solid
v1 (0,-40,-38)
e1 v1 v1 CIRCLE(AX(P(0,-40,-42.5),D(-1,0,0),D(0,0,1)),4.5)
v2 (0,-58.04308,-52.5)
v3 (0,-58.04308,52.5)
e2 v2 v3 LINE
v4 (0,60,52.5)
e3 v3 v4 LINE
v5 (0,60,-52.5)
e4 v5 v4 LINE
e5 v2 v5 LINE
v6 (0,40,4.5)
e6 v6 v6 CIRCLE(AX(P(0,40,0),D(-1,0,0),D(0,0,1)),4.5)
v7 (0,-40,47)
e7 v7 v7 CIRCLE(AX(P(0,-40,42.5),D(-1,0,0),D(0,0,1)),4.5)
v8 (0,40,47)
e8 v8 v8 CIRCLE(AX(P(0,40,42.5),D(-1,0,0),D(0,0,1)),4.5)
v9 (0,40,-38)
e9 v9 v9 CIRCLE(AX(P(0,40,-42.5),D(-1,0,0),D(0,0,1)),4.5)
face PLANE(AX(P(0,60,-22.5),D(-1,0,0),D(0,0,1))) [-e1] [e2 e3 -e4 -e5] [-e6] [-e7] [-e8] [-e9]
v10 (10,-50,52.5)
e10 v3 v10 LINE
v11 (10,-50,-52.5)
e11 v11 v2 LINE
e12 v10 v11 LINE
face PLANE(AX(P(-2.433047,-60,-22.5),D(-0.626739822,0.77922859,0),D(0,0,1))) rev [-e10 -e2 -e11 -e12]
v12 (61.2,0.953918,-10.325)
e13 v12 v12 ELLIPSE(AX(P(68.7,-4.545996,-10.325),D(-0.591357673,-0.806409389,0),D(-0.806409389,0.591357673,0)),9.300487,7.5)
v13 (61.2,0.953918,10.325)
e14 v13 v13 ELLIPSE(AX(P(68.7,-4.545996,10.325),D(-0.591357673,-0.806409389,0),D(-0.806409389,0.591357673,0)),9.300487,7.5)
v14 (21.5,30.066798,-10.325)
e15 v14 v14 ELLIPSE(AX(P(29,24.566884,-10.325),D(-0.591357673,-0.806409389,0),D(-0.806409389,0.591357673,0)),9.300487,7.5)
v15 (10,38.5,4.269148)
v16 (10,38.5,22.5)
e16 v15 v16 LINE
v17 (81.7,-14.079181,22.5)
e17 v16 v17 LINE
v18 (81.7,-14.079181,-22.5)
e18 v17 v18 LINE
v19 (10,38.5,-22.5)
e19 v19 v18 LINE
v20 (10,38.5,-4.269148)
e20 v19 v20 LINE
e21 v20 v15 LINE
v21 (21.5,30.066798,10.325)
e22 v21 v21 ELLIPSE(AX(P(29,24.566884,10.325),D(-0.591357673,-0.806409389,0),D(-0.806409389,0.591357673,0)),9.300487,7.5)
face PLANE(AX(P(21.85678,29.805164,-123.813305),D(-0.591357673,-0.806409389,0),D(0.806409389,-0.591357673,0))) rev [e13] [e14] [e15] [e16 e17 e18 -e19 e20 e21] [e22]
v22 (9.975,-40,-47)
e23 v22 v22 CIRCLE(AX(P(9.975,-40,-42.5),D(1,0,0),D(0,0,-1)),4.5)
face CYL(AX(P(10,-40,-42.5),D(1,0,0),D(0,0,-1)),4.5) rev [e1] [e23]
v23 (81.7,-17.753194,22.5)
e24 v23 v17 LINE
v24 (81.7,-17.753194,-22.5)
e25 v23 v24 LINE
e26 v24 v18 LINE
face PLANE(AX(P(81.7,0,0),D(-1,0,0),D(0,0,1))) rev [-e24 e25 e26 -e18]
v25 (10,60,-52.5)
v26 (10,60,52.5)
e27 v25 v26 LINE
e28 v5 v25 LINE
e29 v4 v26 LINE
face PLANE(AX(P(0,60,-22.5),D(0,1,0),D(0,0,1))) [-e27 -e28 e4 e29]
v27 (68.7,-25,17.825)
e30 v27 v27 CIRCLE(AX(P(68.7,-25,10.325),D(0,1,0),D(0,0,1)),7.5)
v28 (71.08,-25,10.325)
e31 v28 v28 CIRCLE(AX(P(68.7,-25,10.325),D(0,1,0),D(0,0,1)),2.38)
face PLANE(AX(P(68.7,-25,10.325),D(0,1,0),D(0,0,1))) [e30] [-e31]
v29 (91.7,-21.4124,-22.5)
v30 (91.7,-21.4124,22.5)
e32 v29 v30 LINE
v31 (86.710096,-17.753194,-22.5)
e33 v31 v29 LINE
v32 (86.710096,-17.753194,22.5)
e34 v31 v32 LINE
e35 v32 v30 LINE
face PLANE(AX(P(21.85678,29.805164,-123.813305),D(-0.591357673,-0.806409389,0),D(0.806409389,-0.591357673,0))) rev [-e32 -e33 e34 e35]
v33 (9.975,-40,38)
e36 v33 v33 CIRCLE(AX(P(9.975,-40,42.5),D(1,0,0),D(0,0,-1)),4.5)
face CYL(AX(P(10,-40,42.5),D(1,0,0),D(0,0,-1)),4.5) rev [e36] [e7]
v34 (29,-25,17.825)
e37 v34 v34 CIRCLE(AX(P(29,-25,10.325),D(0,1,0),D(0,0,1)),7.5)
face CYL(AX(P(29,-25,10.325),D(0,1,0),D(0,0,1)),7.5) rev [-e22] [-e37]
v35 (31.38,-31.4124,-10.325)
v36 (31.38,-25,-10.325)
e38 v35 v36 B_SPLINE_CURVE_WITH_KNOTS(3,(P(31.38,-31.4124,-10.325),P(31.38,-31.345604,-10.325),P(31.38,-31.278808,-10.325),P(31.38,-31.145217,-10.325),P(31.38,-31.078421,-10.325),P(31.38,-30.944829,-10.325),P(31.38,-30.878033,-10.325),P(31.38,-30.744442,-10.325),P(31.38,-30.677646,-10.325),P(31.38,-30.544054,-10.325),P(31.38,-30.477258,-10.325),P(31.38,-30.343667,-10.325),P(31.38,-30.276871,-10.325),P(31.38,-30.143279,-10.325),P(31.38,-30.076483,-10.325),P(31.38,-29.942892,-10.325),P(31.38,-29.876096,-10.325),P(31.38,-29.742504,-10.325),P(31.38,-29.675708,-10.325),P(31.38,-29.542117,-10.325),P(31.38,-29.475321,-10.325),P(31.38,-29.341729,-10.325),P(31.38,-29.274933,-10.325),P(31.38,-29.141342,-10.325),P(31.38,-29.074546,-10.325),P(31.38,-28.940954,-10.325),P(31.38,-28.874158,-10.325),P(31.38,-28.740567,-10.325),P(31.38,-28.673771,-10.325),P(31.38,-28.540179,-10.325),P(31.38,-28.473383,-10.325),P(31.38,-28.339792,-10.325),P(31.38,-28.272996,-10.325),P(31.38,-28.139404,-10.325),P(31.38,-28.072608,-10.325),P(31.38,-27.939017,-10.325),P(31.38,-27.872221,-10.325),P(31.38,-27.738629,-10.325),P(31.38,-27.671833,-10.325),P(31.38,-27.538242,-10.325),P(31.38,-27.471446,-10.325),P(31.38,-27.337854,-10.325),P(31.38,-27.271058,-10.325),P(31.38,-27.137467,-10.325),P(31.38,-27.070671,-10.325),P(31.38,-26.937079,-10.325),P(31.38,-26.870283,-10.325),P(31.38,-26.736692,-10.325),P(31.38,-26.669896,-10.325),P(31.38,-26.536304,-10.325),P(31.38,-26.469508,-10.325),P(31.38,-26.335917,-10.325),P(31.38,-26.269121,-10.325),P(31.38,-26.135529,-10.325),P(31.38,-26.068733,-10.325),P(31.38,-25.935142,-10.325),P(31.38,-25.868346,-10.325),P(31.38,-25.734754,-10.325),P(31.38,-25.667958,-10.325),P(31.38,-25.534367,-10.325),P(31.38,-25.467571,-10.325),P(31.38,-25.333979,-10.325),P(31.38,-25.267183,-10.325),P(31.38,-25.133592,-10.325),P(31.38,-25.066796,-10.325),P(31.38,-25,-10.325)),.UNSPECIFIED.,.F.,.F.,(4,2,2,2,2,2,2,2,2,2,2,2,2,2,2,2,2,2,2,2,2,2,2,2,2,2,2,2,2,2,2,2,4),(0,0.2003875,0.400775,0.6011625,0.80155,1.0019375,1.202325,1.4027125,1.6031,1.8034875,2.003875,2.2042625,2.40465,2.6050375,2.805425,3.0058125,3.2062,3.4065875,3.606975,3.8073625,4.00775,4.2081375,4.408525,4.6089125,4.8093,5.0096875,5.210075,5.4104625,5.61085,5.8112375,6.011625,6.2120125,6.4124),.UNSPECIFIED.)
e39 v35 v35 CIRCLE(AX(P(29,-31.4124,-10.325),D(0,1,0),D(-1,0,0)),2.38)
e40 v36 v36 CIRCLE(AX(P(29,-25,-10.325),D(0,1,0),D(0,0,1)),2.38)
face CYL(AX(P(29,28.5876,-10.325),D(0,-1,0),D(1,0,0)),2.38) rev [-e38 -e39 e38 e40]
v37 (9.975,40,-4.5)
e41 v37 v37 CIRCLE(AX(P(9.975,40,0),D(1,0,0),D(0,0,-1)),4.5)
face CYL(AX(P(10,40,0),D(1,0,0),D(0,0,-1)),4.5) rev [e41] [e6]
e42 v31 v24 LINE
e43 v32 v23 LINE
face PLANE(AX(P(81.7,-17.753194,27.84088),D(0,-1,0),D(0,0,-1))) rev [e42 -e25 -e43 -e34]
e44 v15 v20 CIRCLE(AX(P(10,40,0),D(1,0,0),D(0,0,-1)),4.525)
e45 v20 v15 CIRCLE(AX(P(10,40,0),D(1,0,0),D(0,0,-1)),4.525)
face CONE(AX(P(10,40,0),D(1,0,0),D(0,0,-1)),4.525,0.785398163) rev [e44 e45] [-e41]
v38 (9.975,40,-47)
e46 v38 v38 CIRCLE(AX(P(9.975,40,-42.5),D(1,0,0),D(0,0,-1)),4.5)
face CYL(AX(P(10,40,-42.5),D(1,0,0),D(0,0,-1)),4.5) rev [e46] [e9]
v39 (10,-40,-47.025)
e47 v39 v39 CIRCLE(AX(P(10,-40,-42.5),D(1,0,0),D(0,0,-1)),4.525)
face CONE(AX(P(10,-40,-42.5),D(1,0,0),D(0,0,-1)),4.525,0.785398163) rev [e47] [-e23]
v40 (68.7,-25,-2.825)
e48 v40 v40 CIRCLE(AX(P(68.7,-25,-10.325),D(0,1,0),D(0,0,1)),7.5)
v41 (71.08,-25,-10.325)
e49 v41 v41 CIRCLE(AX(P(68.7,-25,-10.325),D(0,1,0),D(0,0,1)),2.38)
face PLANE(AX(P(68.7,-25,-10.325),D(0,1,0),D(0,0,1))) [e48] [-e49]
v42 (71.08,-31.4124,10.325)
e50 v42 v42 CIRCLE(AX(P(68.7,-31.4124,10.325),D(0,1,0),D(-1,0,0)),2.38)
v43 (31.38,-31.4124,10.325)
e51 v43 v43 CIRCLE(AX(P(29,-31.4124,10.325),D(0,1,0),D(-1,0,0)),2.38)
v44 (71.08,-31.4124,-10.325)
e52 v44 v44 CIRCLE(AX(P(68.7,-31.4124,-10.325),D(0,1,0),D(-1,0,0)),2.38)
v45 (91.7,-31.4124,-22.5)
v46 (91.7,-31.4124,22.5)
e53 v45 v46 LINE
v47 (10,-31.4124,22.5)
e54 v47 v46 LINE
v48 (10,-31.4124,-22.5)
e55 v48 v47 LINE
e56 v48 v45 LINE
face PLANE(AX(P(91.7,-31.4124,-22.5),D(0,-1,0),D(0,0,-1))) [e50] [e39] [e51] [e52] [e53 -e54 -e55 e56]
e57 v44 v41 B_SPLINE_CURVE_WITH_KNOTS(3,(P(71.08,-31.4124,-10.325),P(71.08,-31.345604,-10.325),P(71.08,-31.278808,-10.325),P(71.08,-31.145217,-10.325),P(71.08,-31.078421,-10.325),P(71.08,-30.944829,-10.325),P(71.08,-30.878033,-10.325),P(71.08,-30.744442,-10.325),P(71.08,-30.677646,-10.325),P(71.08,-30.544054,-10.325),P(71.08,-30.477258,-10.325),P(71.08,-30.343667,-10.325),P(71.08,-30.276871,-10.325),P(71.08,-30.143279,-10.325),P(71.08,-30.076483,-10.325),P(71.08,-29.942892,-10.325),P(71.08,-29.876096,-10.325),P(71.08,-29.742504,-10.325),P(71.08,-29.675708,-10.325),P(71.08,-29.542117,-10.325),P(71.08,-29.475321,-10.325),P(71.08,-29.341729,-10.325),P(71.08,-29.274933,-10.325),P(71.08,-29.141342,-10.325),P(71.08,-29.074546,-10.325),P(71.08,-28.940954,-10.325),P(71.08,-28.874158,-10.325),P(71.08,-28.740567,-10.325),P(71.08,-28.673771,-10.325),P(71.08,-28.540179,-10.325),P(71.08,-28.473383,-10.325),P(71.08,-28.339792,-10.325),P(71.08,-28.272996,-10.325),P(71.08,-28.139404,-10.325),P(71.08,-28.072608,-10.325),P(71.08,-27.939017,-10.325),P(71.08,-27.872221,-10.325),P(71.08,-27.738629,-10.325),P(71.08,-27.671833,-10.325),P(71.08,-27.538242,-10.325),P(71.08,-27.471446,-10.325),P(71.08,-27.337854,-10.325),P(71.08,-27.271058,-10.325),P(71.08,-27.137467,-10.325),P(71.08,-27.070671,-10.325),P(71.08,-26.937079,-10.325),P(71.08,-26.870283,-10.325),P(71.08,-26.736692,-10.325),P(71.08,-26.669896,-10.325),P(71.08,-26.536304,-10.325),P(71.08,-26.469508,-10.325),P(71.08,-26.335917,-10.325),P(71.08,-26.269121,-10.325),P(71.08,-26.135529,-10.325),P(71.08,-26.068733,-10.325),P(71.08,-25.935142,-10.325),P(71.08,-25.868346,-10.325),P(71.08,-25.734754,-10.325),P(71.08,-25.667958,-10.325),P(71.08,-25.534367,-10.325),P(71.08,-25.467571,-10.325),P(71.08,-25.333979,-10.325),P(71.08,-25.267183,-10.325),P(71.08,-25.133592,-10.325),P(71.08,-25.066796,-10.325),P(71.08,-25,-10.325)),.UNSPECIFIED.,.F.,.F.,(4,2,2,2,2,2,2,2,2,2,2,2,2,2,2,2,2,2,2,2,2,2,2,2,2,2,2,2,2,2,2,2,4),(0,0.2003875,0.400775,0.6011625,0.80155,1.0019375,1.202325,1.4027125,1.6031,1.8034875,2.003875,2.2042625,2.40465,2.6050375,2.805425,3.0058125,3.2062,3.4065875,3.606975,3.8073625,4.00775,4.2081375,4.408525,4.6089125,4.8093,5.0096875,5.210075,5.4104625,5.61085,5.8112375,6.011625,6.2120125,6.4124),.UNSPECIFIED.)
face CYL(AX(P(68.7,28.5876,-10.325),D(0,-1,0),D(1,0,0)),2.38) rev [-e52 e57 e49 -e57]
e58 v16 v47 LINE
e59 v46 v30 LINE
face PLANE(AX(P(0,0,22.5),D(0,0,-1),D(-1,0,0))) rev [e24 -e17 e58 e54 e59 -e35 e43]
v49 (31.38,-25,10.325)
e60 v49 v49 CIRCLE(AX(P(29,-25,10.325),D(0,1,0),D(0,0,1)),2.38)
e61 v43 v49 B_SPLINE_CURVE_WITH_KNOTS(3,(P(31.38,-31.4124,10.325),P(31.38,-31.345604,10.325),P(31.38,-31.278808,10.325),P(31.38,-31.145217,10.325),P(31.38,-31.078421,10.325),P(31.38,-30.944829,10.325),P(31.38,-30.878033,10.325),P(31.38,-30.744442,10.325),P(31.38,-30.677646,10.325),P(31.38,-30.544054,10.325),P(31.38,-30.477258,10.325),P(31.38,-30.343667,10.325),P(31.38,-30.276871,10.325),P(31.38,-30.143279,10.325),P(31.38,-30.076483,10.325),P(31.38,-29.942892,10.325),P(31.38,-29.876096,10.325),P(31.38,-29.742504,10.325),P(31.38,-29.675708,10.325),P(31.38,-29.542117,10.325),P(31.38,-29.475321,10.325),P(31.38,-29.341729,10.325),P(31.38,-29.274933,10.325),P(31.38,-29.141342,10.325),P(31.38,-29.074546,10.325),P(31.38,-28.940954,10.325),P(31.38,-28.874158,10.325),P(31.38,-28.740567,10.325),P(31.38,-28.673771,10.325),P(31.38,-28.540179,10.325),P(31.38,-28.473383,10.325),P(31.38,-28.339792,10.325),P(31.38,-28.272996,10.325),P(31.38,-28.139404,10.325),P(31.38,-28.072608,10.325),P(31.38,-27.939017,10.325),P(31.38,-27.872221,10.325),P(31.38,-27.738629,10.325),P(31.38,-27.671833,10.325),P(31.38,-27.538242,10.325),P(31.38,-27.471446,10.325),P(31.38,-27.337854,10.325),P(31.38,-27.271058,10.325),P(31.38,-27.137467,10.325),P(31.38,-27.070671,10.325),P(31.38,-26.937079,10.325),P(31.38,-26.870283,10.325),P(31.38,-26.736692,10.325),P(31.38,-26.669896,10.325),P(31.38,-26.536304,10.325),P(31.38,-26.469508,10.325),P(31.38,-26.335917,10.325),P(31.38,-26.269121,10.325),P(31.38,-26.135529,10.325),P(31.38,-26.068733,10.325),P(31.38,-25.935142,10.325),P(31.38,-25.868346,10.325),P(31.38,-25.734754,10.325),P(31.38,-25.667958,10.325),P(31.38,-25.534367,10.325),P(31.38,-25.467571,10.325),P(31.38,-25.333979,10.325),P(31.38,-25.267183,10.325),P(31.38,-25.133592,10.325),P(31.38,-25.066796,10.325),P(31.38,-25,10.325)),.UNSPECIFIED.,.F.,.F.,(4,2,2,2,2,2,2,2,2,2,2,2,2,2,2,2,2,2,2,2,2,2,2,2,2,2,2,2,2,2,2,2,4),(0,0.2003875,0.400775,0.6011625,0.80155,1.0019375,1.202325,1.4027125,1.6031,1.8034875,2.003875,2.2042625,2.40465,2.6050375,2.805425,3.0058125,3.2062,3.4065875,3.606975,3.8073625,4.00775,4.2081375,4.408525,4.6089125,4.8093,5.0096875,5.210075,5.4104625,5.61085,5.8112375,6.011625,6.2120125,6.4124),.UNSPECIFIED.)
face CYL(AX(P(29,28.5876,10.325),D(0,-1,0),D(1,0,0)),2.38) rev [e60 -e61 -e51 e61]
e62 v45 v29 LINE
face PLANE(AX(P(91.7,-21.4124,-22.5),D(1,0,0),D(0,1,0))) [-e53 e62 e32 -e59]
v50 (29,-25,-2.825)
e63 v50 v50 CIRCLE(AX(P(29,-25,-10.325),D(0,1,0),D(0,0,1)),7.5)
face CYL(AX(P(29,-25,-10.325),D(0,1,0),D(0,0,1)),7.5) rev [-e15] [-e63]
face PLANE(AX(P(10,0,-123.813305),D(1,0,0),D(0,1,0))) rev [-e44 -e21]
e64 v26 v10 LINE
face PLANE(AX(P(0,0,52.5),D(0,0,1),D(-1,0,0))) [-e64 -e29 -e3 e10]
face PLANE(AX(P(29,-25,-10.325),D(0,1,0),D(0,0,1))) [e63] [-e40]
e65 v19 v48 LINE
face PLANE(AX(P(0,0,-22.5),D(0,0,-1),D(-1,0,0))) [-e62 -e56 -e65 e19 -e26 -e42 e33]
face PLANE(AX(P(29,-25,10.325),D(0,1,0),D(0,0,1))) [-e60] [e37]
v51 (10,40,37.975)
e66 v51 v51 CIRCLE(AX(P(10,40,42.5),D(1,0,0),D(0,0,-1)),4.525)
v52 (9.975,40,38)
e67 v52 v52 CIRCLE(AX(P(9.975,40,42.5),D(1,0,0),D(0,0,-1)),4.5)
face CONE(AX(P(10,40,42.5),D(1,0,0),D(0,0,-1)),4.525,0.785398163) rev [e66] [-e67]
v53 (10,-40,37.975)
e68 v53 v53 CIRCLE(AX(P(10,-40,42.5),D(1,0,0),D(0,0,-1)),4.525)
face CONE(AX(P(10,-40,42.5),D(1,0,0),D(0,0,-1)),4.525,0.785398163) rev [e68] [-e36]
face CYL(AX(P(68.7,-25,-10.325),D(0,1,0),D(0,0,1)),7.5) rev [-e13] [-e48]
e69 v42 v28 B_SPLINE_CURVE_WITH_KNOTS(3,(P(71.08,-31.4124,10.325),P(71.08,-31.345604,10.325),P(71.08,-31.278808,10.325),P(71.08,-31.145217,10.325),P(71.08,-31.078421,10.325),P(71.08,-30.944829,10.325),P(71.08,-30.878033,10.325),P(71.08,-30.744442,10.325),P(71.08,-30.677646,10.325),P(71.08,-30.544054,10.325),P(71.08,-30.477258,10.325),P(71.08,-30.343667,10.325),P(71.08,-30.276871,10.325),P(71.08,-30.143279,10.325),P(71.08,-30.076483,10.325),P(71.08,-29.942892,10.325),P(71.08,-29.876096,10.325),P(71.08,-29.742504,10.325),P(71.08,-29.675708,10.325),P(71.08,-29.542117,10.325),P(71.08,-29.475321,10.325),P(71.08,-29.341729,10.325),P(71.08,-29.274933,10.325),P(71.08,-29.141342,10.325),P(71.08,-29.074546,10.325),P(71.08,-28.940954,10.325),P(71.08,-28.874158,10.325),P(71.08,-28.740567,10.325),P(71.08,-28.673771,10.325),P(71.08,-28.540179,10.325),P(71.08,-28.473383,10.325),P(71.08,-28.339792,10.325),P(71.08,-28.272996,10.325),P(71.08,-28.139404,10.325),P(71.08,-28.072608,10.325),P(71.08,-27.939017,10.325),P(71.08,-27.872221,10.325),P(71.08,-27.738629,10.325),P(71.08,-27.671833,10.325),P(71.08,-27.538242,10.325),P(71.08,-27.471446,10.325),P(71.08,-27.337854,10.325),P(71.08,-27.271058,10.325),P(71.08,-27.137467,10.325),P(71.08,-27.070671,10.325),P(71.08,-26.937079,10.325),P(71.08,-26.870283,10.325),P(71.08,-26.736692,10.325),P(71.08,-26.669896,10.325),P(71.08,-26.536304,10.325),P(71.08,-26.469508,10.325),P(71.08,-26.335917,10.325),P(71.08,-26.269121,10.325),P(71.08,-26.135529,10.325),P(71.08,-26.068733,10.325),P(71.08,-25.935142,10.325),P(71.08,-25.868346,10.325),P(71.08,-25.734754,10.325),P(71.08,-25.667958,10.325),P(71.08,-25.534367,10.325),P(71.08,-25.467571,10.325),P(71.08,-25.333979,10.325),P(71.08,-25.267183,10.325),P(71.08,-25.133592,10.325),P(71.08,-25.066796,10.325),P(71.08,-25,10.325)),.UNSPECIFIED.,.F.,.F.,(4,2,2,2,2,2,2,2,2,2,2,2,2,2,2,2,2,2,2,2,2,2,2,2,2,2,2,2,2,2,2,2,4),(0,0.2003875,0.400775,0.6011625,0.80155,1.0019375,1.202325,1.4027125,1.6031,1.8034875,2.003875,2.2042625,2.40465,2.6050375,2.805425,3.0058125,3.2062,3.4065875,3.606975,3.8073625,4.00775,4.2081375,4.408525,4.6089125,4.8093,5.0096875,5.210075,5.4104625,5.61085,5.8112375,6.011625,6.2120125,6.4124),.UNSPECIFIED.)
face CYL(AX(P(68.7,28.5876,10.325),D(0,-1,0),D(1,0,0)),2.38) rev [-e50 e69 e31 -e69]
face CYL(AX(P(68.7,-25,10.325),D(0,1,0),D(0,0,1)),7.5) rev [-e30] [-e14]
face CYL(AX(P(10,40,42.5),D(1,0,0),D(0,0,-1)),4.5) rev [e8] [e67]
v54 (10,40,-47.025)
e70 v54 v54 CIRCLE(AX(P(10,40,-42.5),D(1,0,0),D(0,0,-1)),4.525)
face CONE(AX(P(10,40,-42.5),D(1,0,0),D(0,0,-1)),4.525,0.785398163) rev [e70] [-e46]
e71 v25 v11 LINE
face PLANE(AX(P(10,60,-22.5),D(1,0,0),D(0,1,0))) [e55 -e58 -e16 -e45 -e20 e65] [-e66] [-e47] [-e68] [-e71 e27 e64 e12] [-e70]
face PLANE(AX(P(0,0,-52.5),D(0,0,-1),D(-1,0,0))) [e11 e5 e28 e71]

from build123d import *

# Parameters (mm, degrees)
BOSS_EXTRUDE1_DEPTH           = 22.5
BOSS_EXTRUDE1_DEPTH_BACK      = 22.5
SKETCH8_W                     = 10
SKETCH8_H                     = 120
BOSS_EXTRUDE2_DEPTH           = 30
M8_CLEARANCE_HOLE2_AT_2_COUNT = 2
M8_CLEARANCE_HOLE2_AT_2_PITCH = 90.58835466
M8_CLEARANCE_HOLE2_AT_3_COUNT = 2
M8_CLEARANCE_HOLE2_AT_3_PITCH = 42.5
BOSS_EXTRUDE3_REACH           = 134.793
SKETCH2_R                     = 2.38
CUT_EXTRUDE1_DEPTH            = 60
CHAMFER4_SIZE                 = 10
CHAMFER4_SIZE_2               = 12.433047379
SKETCH18_R                    = 7.5
CUT_EXTRUDE4_DEPTH            = 85
SKETCH19_W                    = 61.758143573
SKETCH19_H                    = 25.520807093
CUT_EXTRUDE5_DEPTH            = 10


with BuildPart() as part:
    # Sketch1 → Boss-Extrude1 (new, two sides: drawn at the far end of the back side and taken through both)
    with BuildSketch(Plane.XY.offset(-BOSS_EXTRUDE1_DEPTH_BACK)):
        Polygon((0, 60), (10, 60), (10, -21.4124), (91.7, -21.4124), (91.7, -31.4124), (10, -31.4124), (10, -60), (0, -60), align=None)
    extrude(amount=BOSS_EXTRUDE1_DEPTH + BOSS_EXTRUDE1_DEPTH_BACK)

    # Sketch8 → Boss-Extrude2 (add)
    with BuildSketch(Plane(origin=(0, 0, -22.5), x_dir=(-1, 0, 0), z_dir=(0, 0, -1))):
        with Locations((-5, 0)):
            Rectangle(SKETCH8_W, SKETCH8_H)
    boss_extrude2 = extrude(amount=BOSS_EXTRUDE2_DEPTH)

    # Sketch10 → M8 Clearance Hole2 (revolve, cut)
    with BuildSketch(Plane(origin=(10, 40, 0), x_dir=(0, 0, -1), z_dir=(0, 1, 0))):
        Polygon((0, 0), (0, 25.703872786), (4.5, 23), (4.5, 0.025), (4.525, 0), align=None)
    m8_clearance_hole2 = revolve(axis=Axis((16.35, 40, 0), (-1, 0, 0)), mode=Mode.SUBTRACT)

    # M8 Clearance Hole2 at 2: M8 Clearance Hole2 ×2
    with Locations(*[Vector(0, -0.8831157194574106, -0.4691552259617494) * (i * M8_CLEARANCE_HOLE2_AT_2_PITCH) for i in range(1, M8_CLEARANCE_HOLE2_AT_2_COUNT)]):
        add(m8_clearance_hole2, mode=Mode.SUBTRACT)

    # M8 Clearance Hole2 at 3: M8 Clearance Hole2 ×2
    with Locations(*[(0, 0, -i * M8_CLEARANCE_HOLE2_AT_3_PITCH) for i in range(1, M8_CLEARANCE_HOLE2_AT_3_COUNT)]):
        add(m8_clearance_hole2, mode=Mode.SUBTRACT)

    # Boss-Extrude3: up to this face of the body (flat: up to its plane)
    boss_extrude3_end = Plane(part.part.faces().sort_by_distance((50.85, -26.4124, -22.5))[0])
    # Sketch14 → Boss-Extrude3 (add, up to the picked face)
    with BuildSketch(Plane.XY.offset(22.5), mode=Mode.PRIVATE) as boss_extrude3_sk1:
        Polygon((91.7, -21.4124), (10, 38.5), (10, -21.4124), align=None)
    boss_extrude3_tool1 = split(extrude(boss_extrude3_sk1.sketch, amount=-BOSS_EXTRUDE3_REACH, mode=Mode.PRIVATE), bisect_by=boss_extrude3_end, keep=Keep.BOTH, mode=Mode.PRIVATE)
    add(boss_extrude3_tool1.solids().sort_by(Axis((37.233333, -1.4416, 22.5), (0, 0, -1)))[0])

    # Sketch2 → Cut-Extrude1 (cut)
    with BuildSketch(Plane(origin=(0, -31.4124, 0), x_dir=(1, 0, 0), z_dir=(0, 1, 0))):
        with Locations((68.7, 10.325)):
            Circle(SKETCH2_R)
        with Locations((68.7, -10.325)):
            Circle(SKETCH2_R)
        with Locations((29, 10.325)):
            Circle(SKETCH2_R)
        with Locations((29, -10.325)):
            Circle(SKETCH2_R)
    extrude(amount=CUT_EXTRUDE1_DEPTH, mode=Mode.SUBTRACT)

    # Mirror2: Boss-Extrude2, M8 Clearance Hole2 across plane
    add(boss_extrude2.mirror(Plane.XY))
    add(m8_clearance_hole2.mirror(Plane.XY), mode=Mode.SUBTRACT)

    # Mirror2 copy 1 sketch → Mirror2 copy 1 (revolve, cut)
    with BuildSketch(Plane(origin=(10, -40, 42.5), x_dir=(0, 0, 1), z_dir=(0, 1, 0))):
        Polygon((0, 0), (0, -25.703872786), (4.5, -23), (4.5, -0.025), (4.525, 0), align=None)
    revolve(axis=Axis((16.35, -40, 42.5), (1, 0, 0)), mode=Mode.SUBTRACT)

    # Mirror2 copy 2 sketch → Mirror2 copy 2 (revolve, cut)
    with BuildSketch(Plane(origin=(10, 40, 42.5), x_dir=(0, 0, 1), z_dir=(0, 1, 0))):
        Polygon((0, 0), (0, -25.703872786), (4.5, -23), (4.5, -0.025), (4.525, 0), align=None)
    revolve(axis=Axis((16.35, 40, 42.5), (1, 0, 0)), mode=Mode.SUBTRACT)

    # Chamfer4
    # the kernel refuses this chamfer: 12.433047379, 10 mm, written as the material it takes off along each edge
    with BuildSketch(Plane(origin=(10, -60, 84.560907877), x_dir=(0.03755485384602002, 0.9992945676589081, 0), z_dir=(0, 0, -1))) as chamfer4_piece_1:
        Polygon((CHAMFER4_SIZE * 0.999294567659, -CHAMFER4_SIZE * 0.037554853846), (-CHAMFER4_SIZE_2 * 0.037554853846, -CHAMFER4_SIZE_2 * 0.999294567658), (0, 0), align=None)
    extrude(amount=169.121815753, mode=Mode.SUBTRACT)

    # Sketch18 → Cut-Extrude4 (cut)
    with BuildSketch(Plane(origin=(0, 60, 0), x_dir=(1, 0, 0), z_dir=(0, 1, 0))):
        with Locations(Location((29, 10.325, 0), (0, 0, 270))):
            Circle(SKETCH18_R)
        with Locations(Location((29, -10.325, 0), (0, 0, 270))):
            Circle(SKETCH18_R)
        with Locations(Location((68.7, 10.325, 0), (0, 0, 270))):
            Circle(SKETCH18_R)
        with Locations(Location((68.7, -10.325, 0), (0, 0, 270))):
            Circle(SKETCH18_R)
    extrude(amount=-CUT_EXTRUDE4_DEPTH, mode=Mode.SUBTRACT)

    # Sketch19 → Cut-Extrude5 (cut)
    with BuildSketch(Plane(origin=(91.7, 0, 0), x_dir=(0, 0, -1), z_dir=(1, 0, 0))):
        with Locations((3.038191321, -4.992790305)):
            Rectangle(SKETCH19_W, SKETCH19_H)
    extrude(amount=-CUT_EXTRUDE5_DEPTH, mode=Mode.SUBTRACT)


solid = part.part
